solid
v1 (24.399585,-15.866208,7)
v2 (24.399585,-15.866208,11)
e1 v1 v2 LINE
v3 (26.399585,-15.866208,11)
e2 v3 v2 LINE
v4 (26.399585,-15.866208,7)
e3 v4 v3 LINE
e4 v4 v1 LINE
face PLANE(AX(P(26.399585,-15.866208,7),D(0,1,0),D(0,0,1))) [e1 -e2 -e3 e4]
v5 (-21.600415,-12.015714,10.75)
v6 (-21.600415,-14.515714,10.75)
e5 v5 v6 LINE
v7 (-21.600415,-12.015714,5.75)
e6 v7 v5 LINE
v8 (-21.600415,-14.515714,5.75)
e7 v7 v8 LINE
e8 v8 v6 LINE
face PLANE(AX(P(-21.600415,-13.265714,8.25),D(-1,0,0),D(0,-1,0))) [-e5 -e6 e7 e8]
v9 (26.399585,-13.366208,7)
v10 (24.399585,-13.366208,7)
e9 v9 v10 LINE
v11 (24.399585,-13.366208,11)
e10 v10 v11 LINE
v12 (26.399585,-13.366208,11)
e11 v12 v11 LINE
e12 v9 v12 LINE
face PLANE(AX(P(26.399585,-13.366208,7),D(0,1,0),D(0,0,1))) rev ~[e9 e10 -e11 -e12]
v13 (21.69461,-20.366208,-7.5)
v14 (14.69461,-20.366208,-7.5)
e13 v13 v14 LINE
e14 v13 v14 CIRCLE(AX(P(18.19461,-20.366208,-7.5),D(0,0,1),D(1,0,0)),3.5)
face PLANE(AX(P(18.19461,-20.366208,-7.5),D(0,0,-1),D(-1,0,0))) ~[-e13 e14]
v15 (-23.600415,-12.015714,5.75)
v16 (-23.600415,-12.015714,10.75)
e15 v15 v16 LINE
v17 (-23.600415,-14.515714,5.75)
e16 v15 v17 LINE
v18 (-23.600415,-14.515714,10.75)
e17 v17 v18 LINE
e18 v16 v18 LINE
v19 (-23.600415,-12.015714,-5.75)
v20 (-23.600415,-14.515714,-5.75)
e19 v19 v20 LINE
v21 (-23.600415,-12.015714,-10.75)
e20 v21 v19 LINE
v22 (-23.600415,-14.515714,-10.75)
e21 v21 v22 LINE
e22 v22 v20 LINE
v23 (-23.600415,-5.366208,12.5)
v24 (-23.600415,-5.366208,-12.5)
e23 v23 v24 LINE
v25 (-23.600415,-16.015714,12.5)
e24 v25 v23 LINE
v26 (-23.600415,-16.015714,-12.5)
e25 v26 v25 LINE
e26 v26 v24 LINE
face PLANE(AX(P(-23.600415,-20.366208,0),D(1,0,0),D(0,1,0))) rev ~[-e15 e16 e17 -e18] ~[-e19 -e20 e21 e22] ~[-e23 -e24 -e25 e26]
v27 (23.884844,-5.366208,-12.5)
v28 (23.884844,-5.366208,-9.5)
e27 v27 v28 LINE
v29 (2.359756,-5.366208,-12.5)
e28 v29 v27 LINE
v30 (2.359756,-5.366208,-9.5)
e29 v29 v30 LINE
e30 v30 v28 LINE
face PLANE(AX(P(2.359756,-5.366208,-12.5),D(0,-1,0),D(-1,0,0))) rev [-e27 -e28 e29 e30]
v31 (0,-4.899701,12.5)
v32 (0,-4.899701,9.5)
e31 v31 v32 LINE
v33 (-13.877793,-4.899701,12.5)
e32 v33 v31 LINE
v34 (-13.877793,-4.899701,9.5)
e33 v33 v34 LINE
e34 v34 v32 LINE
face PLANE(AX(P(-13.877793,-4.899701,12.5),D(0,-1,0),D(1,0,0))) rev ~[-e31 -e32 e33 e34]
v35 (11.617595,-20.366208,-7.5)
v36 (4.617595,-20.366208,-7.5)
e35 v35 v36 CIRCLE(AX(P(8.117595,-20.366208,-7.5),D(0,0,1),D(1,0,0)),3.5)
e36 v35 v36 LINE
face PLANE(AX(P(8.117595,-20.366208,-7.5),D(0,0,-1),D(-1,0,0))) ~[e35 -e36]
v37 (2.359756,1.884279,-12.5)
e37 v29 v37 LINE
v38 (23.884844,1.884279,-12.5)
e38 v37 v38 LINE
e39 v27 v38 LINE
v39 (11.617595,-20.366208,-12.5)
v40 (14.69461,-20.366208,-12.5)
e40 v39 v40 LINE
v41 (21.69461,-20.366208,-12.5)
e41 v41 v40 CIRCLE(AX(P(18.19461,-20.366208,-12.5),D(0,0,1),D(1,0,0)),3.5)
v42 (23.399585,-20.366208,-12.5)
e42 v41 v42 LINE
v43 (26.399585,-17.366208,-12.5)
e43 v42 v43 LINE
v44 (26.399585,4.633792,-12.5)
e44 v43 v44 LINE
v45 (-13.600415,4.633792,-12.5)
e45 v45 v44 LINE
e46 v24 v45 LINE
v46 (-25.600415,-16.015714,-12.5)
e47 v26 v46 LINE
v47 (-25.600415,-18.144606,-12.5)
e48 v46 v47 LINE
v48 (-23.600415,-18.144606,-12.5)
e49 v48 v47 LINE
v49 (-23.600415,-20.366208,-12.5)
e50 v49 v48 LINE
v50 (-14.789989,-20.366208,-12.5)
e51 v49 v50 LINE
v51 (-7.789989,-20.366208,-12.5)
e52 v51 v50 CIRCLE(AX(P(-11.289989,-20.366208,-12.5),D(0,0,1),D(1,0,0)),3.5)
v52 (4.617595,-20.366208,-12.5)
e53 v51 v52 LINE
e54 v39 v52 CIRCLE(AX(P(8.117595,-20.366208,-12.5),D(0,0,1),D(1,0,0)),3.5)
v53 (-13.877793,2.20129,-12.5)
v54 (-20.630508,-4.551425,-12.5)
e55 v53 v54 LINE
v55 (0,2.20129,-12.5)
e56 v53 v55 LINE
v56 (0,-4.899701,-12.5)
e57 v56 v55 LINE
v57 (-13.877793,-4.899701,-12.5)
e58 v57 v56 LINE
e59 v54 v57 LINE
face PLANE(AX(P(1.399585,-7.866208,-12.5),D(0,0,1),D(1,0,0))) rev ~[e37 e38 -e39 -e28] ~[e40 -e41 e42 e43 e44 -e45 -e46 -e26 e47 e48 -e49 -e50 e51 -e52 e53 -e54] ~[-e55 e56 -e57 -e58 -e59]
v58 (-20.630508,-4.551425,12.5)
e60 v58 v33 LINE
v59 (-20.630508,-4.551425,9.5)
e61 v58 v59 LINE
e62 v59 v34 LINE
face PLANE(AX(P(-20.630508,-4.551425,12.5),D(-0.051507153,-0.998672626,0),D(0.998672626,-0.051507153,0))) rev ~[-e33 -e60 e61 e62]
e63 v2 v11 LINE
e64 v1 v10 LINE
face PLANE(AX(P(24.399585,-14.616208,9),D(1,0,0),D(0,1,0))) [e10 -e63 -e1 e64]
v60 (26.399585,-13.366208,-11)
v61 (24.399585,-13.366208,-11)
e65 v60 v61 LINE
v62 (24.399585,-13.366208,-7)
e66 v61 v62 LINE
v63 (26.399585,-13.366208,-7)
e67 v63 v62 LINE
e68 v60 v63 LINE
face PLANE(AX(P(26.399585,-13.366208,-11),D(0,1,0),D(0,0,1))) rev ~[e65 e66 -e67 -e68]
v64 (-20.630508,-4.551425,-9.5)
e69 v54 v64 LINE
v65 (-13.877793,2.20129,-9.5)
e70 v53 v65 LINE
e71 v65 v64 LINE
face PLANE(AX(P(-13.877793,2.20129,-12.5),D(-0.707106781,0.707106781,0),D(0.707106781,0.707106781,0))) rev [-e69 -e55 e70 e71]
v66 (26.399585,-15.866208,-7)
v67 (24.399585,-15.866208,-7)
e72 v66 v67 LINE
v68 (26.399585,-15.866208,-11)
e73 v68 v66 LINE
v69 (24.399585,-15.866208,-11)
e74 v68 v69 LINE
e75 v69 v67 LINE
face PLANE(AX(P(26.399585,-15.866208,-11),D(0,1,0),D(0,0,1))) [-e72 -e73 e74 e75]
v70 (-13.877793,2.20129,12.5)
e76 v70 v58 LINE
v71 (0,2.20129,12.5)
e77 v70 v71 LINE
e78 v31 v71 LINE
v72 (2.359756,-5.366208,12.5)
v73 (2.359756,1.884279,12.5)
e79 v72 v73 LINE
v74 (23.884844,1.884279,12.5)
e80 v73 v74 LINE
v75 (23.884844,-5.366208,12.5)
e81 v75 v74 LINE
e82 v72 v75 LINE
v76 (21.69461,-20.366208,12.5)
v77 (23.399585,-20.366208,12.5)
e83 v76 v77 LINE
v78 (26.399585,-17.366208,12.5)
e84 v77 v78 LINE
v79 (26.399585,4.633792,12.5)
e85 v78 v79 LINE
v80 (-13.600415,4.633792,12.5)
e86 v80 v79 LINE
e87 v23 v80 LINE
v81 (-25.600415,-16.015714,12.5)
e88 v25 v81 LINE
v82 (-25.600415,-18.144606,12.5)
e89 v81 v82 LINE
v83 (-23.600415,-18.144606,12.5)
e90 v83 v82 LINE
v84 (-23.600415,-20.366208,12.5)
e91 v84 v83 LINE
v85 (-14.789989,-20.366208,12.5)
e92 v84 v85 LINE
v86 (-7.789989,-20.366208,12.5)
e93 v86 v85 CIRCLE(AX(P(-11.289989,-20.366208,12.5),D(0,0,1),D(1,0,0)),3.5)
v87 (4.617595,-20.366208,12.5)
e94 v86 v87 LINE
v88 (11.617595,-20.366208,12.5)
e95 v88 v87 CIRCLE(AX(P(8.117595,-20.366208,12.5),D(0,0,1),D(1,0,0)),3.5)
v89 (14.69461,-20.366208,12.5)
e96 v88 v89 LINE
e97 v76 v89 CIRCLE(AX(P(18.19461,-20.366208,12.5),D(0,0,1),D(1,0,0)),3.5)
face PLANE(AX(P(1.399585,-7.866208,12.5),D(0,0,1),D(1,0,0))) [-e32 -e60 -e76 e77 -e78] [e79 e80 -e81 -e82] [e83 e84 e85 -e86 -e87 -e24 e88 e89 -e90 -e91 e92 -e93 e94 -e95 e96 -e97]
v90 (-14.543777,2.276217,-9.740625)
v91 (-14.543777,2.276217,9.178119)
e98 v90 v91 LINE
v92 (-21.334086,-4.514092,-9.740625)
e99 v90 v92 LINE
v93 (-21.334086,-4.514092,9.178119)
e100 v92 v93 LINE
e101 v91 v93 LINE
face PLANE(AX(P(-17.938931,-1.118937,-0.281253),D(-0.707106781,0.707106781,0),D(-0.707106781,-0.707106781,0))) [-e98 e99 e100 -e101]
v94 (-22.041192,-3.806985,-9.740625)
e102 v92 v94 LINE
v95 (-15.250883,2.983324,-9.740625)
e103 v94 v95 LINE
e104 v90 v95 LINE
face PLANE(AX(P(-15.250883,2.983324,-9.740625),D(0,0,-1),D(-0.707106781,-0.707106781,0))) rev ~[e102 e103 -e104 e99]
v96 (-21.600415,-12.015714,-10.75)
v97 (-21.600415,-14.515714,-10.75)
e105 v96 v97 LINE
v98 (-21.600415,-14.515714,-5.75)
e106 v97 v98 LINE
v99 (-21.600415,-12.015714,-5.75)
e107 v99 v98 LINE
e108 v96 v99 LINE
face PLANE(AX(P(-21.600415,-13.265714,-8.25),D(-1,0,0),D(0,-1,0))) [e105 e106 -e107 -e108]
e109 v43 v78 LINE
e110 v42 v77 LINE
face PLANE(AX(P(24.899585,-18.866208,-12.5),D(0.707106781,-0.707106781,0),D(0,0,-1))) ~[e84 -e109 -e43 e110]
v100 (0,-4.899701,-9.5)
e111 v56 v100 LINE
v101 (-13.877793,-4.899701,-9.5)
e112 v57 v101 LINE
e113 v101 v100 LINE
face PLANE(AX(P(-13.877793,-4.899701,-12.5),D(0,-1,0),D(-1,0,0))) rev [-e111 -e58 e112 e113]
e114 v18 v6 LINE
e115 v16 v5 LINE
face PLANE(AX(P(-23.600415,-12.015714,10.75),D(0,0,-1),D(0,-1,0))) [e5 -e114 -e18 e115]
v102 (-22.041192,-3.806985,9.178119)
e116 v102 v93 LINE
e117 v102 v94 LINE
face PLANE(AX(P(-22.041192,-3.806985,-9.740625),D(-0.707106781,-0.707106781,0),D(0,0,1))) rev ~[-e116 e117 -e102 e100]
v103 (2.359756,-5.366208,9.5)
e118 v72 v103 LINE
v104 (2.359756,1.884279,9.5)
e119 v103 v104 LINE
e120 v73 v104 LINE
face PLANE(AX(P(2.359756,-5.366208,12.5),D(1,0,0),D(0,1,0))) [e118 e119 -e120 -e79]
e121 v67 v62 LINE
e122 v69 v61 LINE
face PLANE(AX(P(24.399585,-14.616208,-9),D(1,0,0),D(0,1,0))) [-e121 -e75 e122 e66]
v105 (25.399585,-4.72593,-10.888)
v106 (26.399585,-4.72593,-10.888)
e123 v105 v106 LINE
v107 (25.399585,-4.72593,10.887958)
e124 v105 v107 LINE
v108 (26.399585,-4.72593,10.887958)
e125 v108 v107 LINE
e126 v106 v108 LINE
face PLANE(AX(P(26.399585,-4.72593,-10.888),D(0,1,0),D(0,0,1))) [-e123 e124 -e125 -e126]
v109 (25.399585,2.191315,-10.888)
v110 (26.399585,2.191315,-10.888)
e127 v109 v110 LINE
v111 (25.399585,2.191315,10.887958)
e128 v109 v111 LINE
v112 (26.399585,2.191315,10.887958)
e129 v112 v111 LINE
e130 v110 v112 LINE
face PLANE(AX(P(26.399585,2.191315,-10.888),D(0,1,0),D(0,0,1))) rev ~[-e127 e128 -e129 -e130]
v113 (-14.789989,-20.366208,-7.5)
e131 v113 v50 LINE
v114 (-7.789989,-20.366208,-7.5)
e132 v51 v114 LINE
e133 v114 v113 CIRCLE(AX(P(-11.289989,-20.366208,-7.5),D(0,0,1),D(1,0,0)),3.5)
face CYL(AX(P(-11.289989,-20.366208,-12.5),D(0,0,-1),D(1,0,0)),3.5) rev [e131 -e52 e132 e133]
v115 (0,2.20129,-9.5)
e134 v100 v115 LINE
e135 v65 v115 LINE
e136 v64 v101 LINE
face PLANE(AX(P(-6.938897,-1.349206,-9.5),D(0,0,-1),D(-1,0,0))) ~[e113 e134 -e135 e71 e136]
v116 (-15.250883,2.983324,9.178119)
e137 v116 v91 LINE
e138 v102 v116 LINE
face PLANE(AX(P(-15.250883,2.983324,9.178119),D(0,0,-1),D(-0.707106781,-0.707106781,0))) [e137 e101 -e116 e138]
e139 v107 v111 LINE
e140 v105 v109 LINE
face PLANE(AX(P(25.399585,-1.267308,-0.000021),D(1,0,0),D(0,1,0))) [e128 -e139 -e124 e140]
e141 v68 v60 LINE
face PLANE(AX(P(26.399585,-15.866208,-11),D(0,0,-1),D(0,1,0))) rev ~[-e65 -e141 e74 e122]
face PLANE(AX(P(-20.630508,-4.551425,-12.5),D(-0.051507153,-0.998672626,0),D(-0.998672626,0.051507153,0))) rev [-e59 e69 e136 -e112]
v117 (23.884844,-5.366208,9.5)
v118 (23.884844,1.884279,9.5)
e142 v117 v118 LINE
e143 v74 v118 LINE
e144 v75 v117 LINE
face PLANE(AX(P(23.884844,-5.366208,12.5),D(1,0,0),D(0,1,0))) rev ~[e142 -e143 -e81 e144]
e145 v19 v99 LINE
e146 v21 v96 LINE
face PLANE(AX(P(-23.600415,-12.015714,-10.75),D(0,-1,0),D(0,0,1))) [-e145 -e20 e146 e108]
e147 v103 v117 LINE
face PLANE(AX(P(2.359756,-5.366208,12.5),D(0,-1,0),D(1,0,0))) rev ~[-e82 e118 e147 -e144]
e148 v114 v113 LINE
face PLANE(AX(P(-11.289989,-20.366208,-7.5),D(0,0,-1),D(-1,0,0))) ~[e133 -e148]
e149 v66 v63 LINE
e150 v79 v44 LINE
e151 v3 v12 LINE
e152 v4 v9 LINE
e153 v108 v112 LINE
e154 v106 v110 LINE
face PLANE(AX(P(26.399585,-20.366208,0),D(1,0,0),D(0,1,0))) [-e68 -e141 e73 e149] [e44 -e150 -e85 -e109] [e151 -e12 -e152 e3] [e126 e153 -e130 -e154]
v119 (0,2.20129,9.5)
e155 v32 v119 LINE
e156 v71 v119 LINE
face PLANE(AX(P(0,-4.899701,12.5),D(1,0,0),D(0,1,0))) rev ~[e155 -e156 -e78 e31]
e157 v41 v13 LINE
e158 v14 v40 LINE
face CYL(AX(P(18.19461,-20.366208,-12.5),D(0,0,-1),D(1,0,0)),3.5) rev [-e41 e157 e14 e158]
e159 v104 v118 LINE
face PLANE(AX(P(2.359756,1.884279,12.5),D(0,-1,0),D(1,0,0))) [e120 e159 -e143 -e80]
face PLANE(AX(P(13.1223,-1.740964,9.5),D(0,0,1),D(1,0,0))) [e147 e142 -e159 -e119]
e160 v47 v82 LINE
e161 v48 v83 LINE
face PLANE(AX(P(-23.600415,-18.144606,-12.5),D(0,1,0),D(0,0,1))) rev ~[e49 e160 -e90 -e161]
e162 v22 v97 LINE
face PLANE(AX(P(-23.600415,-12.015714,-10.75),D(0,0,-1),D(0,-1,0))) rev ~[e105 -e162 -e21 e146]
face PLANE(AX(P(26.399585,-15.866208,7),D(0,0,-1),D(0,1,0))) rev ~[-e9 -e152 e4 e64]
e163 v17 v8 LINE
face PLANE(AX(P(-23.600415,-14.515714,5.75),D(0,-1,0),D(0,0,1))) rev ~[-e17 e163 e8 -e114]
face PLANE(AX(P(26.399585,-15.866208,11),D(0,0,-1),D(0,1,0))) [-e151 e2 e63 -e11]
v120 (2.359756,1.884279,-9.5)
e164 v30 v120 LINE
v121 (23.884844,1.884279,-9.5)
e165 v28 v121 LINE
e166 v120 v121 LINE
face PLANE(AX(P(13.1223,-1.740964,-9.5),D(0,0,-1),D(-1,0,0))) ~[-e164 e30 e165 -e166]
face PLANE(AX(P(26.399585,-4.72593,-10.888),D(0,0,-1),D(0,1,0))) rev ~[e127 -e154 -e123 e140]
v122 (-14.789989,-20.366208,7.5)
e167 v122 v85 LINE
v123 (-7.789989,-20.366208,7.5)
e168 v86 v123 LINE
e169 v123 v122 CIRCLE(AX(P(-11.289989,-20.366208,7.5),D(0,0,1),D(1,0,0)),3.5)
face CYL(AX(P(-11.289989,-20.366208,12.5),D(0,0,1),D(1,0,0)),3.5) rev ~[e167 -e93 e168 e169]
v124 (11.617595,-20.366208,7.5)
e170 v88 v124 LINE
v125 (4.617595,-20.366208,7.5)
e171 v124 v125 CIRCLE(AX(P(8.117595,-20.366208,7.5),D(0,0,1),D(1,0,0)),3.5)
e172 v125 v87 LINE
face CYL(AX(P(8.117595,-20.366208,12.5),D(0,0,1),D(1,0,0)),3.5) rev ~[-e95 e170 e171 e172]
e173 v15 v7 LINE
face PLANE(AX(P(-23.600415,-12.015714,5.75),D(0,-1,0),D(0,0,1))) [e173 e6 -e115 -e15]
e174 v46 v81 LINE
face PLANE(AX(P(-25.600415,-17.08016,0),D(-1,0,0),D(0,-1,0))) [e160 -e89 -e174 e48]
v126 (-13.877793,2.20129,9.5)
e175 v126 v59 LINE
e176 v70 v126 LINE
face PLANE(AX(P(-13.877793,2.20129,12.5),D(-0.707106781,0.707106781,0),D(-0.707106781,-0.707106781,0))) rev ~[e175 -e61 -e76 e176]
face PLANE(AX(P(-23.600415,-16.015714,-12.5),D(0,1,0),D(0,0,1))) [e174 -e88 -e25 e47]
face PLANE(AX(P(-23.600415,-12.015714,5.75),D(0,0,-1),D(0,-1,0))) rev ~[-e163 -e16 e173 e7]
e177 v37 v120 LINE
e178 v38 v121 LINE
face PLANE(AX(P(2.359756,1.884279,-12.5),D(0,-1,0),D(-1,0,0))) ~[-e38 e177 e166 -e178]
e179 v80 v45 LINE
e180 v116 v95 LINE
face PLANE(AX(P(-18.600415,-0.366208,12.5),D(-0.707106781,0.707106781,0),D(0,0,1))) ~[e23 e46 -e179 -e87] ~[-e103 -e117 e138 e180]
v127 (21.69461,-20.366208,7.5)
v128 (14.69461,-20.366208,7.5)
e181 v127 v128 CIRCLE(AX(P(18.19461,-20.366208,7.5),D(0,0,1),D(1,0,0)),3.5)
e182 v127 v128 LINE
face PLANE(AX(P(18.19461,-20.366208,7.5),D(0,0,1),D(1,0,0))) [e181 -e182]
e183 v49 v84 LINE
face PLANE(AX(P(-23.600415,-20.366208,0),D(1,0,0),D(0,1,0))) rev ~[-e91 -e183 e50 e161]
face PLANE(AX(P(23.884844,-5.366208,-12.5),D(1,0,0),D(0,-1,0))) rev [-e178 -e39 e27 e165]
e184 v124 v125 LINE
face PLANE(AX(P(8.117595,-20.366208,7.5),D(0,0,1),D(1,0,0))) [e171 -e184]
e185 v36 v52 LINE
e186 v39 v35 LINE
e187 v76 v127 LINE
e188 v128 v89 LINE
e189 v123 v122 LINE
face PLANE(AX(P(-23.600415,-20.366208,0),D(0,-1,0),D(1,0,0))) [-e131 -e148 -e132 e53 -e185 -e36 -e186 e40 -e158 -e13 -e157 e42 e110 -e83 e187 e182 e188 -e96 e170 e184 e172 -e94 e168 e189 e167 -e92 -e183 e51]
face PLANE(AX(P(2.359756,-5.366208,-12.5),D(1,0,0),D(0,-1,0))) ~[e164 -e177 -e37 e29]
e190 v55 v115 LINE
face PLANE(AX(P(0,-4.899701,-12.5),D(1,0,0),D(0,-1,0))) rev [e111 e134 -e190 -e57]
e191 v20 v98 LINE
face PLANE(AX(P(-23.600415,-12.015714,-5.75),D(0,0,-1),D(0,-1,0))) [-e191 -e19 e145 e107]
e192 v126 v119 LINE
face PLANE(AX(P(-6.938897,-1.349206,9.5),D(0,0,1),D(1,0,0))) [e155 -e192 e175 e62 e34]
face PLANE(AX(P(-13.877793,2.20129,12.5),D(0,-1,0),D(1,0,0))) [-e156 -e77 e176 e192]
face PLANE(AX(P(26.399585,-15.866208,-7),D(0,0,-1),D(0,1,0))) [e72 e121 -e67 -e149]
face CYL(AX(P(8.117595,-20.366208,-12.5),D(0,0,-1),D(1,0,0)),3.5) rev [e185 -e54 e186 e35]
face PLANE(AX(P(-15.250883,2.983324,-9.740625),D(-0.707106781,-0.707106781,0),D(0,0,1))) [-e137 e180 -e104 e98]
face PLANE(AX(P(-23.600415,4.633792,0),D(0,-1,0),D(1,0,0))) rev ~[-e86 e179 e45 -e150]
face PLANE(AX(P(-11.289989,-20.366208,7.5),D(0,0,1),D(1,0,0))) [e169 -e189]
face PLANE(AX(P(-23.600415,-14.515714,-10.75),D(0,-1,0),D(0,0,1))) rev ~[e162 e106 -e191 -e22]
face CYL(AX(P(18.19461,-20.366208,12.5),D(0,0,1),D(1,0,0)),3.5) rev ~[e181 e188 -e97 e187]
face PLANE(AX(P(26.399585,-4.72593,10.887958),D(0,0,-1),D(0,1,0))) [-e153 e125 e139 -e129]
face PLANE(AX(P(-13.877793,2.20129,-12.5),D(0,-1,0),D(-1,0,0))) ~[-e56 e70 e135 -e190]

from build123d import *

# Parameters (mm, degrees)
F0_W      = 50
F0_H      = 25
F1_DEPTH  = 12.5
F2_R      = 3.5
F3_DEPTH  = 5
F4_SIZE   = 10
F5_SIZE   = 3
F6_W      = 2.1288916469
F6_H      = 25
F7_DEPTH  = 2
F8_W      = 9.6029471606
F8_H      = 18.9187433571
F9_DEPTH  = 1
F10_W     = 13.8777932152
F10_H     = 7.1009902749
F10_W_2   = 21.5250877663
F10_H_2   = 7.2504867127
F11_DEPTH = 3
F12_W     = 6.9172445219
F12_H     = 21.7759581094
F13_DEPTH = 1
F14_W     = 2.5
F14_H     = 4
F15_DEPTH = 2
F16_W     = 2.5
F16_H     = 5
F17_DEPTH = 2


# Not quite as in the source:
# - a pattern or mirror of a feature is missing from the dataset's text; its kind, count and spacing are read off the source's solid


with BuildPart() as f1:
    # F0 (on Top) → F1 (new body, symmetric)
    with BuildSketch(Plane.XY):
        with Locations((1.3995850459, -7.8662077549)):
            Rectangle(F0_W, F0_H)
    extrude(amount=F1_DEPTH, both=True)

    # F2 (on face) → F3 (cut)
    with BuildSketch(Plane.XY.offset(12.5)):
        with Locations((-11.2899886444, -20.3662077549)):
            Circle(F2_R)
        with Locations((8.1175947562, -20.3662077549)):
            Circle(F2_R)
        with Locations((18.194610253, -20.3662077549)):
            Circle(F2_R)
    f3 = extrude(amount=-F3_DEPTH, mode=Mode.SUBTRACT)

    # F3_copies: F3 across plane
    add(f3.mirror(Plane(origin=(0, 0, 0), x_dir=(-1, 0, 0), z_dir=(0, 0, -1))), mode=Mode.SUBTRACT)

    # F4
    f4_edges = [f1.edges().sort_by_distance(p)[0] for p in [
        (-23.600415, 4.633792, 0),
    ]]
    chamfer(f4_edges, length=F4_SIZE)

    # F5
    f5_edges = [f1.edges().sort_by_distance(p)[0] for p in [
        (26.399585, -20.366208, 0),
    ]]
    chamfer(f5_edges, length=F5_SIZE)

    # F6 (on face) → F7 (join)
    with BuildSketch(Plane(origin=(-23.6004149541, 0, 0), x_dir=(0, -1, 0), z_dir=(-1, 0, 0))):
        with Locations((17.0801598579, 0)):
            Rectangle(F6_W, F6_H)
    extrude(amount=F7_DEPTH)

    # F8 (on face) → F9 (cut, symmetric)
    with BuildSketch(Plane(origin=(-9.1171035996, 9.1171035996, 0), x_dir=(-0.7071067812, -0.7071067812, 0), z_dir=(-0.7071067812, 0.7071067812, 0))):
        with Locations((13.4759480134, -0.2812528983)):
            Rectangle(F8_W, F8_H)
    extrude(amount=F9_DEPTH, both=True, mode=Mode.SUBTRACT)

    # F10 (on face) → F11 (cut)
    with BuildSketch(Plane.XY.offset(12.5)):
        with Locations((-6.9388966076, -1.3492055004)):
            Rectangle(F10_W, F10_H)
        Polygon((-13.8777932152, -4.8997006379), (-13.8777932152, 2.201289637), (-20.6305080792, -4.551425227), align=None)
        with Locations((13.1223001517, -1.7409643986)):
            Rectangle(F10_W_2, F10_H_2)
    f11 = extrude(amount=-F11_DEPTH, mode=Mode.SUBTRACT)

    # F11_copies: F11 across plane
    add(f11.mirror(Plane(origin=(0, 0, 0), x_dir=(-1, 0, 0), z_dir=(0, 0, -1))), mode=Mode.SUBTRACT)

    # F12 (on face) → F13 (cut, symmetric)
    with BuildSketch(Plane.YZ.offset(26.3995850459)):
        with Locations((-1.2673075544, -2.09453e-05)):
            Rectangle(F12_W, F12_H)
    extrude(amount=F13_DEPTH, both=True, mode=Mode.SUBTRACT)

    # F14 (on face) → F15 (cut)
    with BuildSketch(Plane.YZ.offset(26.3995850459)):
        with Locations((-14.6162077549, -9)):
            Rectangle(F14_W, F14_H)
        with Locations((-14.6162077549, 9)):
            Rectangle(F14_W, F14_H)
    extrude(amount=-F15_DEPTH, mode=Mode.SUBTRACT)

    # F16 (on face) → F17 (cut)
    with BuildSketch(Plane(origin=(-23.6004149541, 0, 0), x_dir=(0, -1, 0), z_dir=(-1, 0, 0))):
        with Locations((13.2657140344, 8.25)):
            Rectangle(F16_W, F16_H)
        with Locations((13.2657140344, -8.25)):
            Rectangle(F16_W, F16_H)
    extrude(amount=-F17_DEPTH, mode=Mode.SUBTRACT)


solid = f1.part
